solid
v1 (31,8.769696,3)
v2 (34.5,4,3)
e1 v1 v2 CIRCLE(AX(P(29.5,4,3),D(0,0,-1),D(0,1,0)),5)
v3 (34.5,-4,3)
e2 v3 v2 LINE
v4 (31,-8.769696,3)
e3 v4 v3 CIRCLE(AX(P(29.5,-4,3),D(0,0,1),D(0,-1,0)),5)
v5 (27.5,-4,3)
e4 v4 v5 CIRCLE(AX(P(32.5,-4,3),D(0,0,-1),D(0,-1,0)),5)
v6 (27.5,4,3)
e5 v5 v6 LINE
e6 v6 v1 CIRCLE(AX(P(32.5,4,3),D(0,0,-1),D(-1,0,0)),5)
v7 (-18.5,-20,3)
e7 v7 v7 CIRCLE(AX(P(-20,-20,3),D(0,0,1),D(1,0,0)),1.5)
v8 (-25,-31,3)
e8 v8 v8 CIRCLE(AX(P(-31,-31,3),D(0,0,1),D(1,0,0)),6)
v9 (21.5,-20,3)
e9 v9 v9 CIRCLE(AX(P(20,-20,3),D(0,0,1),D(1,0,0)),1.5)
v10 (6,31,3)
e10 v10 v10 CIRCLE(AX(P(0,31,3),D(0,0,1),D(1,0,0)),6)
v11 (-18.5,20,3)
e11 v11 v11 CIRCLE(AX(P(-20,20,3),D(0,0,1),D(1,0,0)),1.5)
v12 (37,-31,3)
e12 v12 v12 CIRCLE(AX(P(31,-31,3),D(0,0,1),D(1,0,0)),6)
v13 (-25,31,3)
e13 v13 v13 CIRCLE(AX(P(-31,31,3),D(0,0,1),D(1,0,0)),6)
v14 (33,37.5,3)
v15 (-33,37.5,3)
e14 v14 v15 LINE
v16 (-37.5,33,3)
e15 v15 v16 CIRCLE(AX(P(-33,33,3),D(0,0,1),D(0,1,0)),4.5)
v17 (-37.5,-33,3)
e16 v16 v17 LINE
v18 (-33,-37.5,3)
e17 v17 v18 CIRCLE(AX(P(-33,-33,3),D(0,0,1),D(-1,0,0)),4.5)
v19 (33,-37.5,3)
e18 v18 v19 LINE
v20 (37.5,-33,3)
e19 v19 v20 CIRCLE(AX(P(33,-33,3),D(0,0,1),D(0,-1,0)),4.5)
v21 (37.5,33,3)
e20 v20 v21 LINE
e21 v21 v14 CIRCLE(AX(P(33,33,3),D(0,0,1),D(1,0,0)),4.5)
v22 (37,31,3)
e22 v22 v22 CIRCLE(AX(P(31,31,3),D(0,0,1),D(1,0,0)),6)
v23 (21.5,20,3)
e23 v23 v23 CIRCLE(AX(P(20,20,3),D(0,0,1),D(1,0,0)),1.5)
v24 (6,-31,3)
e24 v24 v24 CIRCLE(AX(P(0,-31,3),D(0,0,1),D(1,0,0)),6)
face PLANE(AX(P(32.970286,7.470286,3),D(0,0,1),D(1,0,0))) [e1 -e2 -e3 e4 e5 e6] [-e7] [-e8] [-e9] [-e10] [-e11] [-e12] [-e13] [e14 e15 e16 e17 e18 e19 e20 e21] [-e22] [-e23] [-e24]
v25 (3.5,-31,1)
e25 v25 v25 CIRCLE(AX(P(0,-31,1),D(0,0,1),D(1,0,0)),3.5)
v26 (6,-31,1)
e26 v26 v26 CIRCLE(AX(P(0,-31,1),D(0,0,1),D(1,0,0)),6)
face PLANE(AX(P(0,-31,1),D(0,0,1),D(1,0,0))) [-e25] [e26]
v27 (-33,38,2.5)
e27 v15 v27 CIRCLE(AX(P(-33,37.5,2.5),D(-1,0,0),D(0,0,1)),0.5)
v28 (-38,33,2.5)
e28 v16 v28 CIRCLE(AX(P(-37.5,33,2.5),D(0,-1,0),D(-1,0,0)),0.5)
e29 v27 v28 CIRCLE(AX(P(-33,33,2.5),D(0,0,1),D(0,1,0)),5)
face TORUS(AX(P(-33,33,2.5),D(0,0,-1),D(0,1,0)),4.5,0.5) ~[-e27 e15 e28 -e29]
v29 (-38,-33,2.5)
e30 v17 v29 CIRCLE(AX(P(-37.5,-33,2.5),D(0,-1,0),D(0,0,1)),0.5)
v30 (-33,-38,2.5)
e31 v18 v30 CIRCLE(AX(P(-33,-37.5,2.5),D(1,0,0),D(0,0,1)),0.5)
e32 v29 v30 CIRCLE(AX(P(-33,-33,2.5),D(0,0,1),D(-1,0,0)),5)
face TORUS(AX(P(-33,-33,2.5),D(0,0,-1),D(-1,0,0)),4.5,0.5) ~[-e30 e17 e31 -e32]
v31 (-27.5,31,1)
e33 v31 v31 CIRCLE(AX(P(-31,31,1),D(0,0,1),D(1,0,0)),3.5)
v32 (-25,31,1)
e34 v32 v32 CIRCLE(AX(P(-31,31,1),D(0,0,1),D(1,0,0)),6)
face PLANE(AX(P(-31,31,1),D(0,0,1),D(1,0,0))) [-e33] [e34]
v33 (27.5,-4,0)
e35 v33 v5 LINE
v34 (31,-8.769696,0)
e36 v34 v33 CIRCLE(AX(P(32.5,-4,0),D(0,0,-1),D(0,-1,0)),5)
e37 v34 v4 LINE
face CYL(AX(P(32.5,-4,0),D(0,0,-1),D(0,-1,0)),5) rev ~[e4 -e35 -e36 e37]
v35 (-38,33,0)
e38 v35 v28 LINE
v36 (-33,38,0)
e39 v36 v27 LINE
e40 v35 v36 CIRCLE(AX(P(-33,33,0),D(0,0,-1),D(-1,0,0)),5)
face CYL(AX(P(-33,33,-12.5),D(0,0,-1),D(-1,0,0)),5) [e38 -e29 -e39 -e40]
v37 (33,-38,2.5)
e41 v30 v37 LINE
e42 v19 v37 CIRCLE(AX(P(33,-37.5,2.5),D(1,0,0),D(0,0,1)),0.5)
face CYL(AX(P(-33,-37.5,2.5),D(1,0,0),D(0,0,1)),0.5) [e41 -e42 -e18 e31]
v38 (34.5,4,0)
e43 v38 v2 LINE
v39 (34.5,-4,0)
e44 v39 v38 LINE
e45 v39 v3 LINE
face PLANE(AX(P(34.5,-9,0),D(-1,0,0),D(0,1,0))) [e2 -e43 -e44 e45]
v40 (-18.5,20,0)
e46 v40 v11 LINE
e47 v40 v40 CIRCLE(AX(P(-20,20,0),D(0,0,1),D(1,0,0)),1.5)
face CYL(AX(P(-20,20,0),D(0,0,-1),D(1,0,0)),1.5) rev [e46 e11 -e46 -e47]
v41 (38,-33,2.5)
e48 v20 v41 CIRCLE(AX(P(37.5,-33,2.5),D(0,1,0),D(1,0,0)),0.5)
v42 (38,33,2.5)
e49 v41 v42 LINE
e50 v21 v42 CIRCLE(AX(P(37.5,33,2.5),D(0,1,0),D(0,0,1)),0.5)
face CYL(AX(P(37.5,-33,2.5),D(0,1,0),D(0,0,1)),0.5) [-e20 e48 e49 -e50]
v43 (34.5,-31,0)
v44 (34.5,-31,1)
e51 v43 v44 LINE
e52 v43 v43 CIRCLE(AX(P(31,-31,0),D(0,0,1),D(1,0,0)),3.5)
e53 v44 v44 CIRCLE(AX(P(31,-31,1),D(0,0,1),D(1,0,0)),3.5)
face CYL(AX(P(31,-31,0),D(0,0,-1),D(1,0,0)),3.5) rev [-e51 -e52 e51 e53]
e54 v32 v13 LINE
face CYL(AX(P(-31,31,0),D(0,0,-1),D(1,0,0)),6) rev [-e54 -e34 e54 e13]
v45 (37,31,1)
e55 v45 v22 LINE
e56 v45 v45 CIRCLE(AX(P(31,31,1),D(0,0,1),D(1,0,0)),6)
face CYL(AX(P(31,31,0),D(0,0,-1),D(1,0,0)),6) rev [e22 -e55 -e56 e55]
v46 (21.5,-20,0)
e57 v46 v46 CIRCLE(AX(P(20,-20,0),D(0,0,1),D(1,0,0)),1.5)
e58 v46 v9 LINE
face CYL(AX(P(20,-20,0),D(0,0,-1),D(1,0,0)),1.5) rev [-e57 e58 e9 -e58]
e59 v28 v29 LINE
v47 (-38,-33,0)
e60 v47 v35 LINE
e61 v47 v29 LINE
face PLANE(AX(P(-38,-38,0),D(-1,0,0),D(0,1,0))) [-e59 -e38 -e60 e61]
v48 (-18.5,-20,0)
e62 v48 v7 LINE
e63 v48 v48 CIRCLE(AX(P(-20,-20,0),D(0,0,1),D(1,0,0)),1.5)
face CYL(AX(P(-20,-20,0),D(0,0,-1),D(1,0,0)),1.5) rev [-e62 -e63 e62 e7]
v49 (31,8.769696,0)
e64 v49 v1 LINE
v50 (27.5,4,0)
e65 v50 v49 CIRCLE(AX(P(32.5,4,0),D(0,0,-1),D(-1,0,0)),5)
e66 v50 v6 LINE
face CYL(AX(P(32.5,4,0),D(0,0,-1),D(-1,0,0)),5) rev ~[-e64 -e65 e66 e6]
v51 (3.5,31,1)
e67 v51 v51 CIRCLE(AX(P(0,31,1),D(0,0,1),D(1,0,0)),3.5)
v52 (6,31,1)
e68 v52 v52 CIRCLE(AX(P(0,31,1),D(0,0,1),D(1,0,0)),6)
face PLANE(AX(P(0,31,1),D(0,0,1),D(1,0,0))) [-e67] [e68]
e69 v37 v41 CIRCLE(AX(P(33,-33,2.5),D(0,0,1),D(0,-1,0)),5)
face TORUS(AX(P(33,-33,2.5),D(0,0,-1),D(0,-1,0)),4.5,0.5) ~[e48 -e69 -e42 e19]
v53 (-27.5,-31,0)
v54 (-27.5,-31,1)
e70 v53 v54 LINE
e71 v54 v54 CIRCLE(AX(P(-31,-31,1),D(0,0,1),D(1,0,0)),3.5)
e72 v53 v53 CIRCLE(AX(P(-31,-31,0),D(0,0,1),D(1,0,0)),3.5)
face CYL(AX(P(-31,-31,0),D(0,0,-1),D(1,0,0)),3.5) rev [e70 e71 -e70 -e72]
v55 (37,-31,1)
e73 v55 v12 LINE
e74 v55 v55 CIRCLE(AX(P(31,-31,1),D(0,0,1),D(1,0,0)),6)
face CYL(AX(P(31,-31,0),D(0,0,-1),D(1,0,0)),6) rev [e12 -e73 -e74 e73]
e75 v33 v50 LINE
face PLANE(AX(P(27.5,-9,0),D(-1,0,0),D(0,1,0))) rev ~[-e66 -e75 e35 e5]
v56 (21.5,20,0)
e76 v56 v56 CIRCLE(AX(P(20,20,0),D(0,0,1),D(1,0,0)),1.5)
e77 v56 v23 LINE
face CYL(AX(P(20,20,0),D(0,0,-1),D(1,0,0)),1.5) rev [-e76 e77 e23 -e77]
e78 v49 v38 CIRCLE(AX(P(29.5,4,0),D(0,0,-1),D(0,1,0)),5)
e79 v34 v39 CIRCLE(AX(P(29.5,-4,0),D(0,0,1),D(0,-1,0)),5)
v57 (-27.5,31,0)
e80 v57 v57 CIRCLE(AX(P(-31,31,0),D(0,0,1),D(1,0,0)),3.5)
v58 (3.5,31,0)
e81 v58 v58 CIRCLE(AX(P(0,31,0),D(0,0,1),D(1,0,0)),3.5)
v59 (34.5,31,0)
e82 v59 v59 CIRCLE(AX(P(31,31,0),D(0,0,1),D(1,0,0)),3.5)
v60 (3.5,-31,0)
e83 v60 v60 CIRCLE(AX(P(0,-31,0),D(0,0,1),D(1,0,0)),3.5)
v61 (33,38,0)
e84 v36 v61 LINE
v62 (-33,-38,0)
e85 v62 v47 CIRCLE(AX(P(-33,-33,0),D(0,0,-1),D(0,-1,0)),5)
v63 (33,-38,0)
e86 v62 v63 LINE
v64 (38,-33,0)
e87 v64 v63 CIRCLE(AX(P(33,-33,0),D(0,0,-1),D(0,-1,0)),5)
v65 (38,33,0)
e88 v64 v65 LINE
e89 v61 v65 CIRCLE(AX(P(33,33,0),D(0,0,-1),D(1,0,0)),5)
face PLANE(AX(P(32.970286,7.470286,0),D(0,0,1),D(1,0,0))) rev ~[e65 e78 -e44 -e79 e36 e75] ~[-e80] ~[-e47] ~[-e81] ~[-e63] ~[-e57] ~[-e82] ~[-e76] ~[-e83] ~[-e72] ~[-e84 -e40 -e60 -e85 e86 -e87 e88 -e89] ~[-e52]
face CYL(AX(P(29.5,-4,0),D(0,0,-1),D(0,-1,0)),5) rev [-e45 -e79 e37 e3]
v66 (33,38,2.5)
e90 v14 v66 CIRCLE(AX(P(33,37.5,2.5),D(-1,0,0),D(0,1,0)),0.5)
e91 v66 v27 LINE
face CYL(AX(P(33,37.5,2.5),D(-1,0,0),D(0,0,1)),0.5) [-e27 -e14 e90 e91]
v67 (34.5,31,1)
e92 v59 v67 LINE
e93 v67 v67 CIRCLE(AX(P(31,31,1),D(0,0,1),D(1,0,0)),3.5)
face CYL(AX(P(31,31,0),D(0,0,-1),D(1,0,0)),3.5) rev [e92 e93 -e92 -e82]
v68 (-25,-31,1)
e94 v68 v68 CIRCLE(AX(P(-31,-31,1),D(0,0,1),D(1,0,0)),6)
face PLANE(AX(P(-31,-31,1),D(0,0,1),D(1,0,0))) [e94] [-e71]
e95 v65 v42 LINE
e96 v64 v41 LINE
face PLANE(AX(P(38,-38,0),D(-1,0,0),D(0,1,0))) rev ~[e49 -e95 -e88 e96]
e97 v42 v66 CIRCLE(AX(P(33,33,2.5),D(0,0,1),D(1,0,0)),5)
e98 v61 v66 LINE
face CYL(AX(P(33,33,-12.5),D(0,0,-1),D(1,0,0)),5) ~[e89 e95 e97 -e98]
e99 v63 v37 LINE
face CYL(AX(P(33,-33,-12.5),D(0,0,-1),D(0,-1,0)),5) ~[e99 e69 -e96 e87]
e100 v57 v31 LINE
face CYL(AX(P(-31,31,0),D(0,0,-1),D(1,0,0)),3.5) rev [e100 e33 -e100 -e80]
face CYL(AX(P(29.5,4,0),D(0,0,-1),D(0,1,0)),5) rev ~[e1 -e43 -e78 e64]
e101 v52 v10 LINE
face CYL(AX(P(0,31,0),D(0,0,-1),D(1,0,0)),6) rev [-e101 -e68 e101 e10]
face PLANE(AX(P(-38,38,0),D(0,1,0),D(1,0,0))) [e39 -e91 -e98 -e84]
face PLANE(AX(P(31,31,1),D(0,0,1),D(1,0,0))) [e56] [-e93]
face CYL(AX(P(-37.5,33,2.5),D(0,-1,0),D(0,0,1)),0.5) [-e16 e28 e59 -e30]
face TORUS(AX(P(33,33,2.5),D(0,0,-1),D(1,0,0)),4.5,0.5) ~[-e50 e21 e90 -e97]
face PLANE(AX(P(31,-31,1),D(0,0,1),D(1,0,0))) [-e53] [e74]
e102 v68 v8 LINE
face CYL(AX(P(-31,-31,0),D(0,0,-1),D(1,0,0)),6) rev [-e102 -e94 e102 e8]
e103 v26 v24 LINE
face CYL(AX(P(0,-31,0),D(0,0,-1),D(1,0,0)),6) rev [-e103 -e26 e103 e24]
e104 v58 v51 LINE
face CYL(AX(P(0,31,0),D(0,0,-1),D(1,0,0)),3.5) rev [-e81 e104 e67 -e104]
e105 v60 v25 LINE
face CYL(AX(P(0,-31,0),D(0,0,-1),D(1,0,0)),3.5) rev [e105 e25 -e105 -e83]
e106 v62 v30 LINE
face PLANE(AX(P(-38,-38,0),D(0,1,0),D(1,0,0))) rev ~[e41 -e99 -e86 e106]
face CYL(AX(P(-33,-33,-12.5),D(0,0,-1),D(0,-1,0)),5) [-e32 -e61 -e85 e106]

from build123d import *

# Parameters (mm, degrees)
F0_W        = 76
F0_H        = 76
F0_R        = 6
F0_R_2      = 1.5
F0_W_2      = 7
F0_H_2      = 18
F1_DEPTH    = 3
F0_R_3      = 3.5
F2_DEPTH    = 1
F3_T1_DEPTH = 3
F3_T3_DEPTH = 28
F4_R        = 0.5


# Not quite as in the source:
# - a fillet or chamfer that OpenCascade refuses, or shapes differently, is made with other operations: its cross-section is extruded or revolved along the edge and cut away or added
# - a feature names something its author has since deleted; it is built from what else it names


with BuildPart() as f1:
    # F0 (on Top) → F1 (new body)
    with BuildSketch(Plane.XY):
        Rectangle(F0_W, F0_H)
        with Locations((-31, -31)):
            Circle(F0_R, mode=Mode.SUBTRACT)
        with Locations((-20, -20)):
            Circle(F0_R_2, mode=Mode.SUBTRACT)
        with Locations((0, -31)):
            Circle(F0_R, mode=Mode.SUBTRACT)
        with Locations((31, -31)):
            Circle(F0_R, mode=Mode.SUBTRACT)
        with Locations((20, -20)):
            Circle(F0_R_2, mode=Mode.SUBTRACT)
        with Locations((-20, 20)):
            Circle(F0_R_2, mode=Mode.SUBTRACT)
        with Locations((-31, 31)):
            Circle(F0_R, mode=Mode.SUBTRACT)
        with Locations((31, 0)):
            Rectangle(F0_W_2, F0_H_2, mode=Mode.SUBTRACT)
        with Locations((0, 31)):
            Circle(F0_R, mode=Mode.SUBTRACT)
        with Locations((20, 20)):
            Circle(F0_R_2, mode=Mode.SUBTRACT)
        with Locations((31, 31)):
            Circle(F0_R, mode=Mode.SUBTRACT)
    extrude(amount=F1_DEPTH)

    # F0 (on Top) → F2 (join)
    with BuildSketch(Plane.XY):
        with Locations((-31, 31)):
            Circle(F0_R)
        with Locations((-31, 31)):
            Circle(F0_R_3, mode=Mode.SUBTRACT)
        with Locations((31, 31)):
            Circle(F0_R)
        with Locations((31, 31)):
            Circle(F0_R_3, mode=Mode.SUBTRACT)
        with Locations((31, -31)):
            Circle(F0_R)
        with Locations((31, -31)):
            Circle(F0_R_3, mode=Mode.SUBTRACT)
        with Locations((-31, -31)):
            Circle(F0_R)
        with Locations((-31, -31)):
            Circle(F0_R_3, mode=Mode.SUBTRACT)
        with Locations((0, 31)):
            Circle(F0_R)
        with Locations((0, 31)):
            Circle(F0_R_3, mode=Mode.SUBTRACT)
        with Locations((0, -31)):
            Circle(F0_R)
        with Locations((0, -31)):
            Circle(F0_R_3, mode=Mode.SUBTRACT)
    extrude(amount=F2_DEPTH)

    # F3: fillet of radius 5 on 8 edges, made by hand

    # F3_s2 → F3_t1 (join)
    with BuildSketch(Plane.XY):
        with BuildLine():
            ThreePointArc((29.5, 9), (33.0355339059, 7.5355339059), (34.5, 4))
            Line((34.5, 4), (34.5, 9))
            Line((34.5, 9), (29.5, 9))
        make_face()
        with BuildLine():
            ThreePointArc((29.5, -9), (33.0355339059, -7.5355339059), (34.5, -4))
            Line((34.5, -4), (34.5, -9))
            Line((34.5, -9), (29.5, -9))
        make_face()
        with BuildLine():
            ThreePointArc((32.5, -9), (28.9644660941, -7.5355339059), (27.5, -4))
            Line((27.5, -4), (27.5, -9))
            Line((27.5, -9), (32.5, -9))
        make_face()
        with BuildLine():
            ThreePointArc((27.5, 4), (28.9644660941, 7.5355339059), (32.5, 9))
            Line((32.5, 9), (27.5, 9))
            Line((27.5, 9), (27.5, 4))
        make_face()
    extrude(amount=F3_T1_DEPTH)

    # F3_s4 → F3_t3 (cut)
    with BuildSketch(Plane.XY.offset(-12.5)):
        with BuildLine():
            ThreePointArc((-33, -38), (-36.5355339059, -36.5355339059), (-38, -33))
            Line((-38, -33), (-38, -38))
            Line((-38, -38), (-33, -38))
        make_face()
        with BuildLine():
            ThreePointArc((33, -38), (36.5355339059, -36.5355339059), (38, -33))
            Line((38, -33), (38, -38))
            Line((38, -38), (33, -38))
        make_face()
        with BuildLine():
            ThreePointArc((38, 33), (36.5355339059, 36.5355339059), (33, 38))
            Line((33, 38), (38, 38))
            Line((38, 38), (38, 33))
        make_face()
        with BuildLine():
            ThreePointArc((-38, 33), (-36.5355339059, 36.5355339059), (-33, 38))
            Line((-33, 38), (-38, 38))
            Line((-38, 38), (-38, 33))
        make_face()
    extrude(amount=F3_T3_DEPTH, mode=Mode.SUBTRACT)

    # F4
    f4_edges = [f1.edges().sort_by_distance(p)[0] for p in [
        (0, -38, 3),
    ]]
    fillet(f4_edges, radius=F4_R)


solid = f1.part
